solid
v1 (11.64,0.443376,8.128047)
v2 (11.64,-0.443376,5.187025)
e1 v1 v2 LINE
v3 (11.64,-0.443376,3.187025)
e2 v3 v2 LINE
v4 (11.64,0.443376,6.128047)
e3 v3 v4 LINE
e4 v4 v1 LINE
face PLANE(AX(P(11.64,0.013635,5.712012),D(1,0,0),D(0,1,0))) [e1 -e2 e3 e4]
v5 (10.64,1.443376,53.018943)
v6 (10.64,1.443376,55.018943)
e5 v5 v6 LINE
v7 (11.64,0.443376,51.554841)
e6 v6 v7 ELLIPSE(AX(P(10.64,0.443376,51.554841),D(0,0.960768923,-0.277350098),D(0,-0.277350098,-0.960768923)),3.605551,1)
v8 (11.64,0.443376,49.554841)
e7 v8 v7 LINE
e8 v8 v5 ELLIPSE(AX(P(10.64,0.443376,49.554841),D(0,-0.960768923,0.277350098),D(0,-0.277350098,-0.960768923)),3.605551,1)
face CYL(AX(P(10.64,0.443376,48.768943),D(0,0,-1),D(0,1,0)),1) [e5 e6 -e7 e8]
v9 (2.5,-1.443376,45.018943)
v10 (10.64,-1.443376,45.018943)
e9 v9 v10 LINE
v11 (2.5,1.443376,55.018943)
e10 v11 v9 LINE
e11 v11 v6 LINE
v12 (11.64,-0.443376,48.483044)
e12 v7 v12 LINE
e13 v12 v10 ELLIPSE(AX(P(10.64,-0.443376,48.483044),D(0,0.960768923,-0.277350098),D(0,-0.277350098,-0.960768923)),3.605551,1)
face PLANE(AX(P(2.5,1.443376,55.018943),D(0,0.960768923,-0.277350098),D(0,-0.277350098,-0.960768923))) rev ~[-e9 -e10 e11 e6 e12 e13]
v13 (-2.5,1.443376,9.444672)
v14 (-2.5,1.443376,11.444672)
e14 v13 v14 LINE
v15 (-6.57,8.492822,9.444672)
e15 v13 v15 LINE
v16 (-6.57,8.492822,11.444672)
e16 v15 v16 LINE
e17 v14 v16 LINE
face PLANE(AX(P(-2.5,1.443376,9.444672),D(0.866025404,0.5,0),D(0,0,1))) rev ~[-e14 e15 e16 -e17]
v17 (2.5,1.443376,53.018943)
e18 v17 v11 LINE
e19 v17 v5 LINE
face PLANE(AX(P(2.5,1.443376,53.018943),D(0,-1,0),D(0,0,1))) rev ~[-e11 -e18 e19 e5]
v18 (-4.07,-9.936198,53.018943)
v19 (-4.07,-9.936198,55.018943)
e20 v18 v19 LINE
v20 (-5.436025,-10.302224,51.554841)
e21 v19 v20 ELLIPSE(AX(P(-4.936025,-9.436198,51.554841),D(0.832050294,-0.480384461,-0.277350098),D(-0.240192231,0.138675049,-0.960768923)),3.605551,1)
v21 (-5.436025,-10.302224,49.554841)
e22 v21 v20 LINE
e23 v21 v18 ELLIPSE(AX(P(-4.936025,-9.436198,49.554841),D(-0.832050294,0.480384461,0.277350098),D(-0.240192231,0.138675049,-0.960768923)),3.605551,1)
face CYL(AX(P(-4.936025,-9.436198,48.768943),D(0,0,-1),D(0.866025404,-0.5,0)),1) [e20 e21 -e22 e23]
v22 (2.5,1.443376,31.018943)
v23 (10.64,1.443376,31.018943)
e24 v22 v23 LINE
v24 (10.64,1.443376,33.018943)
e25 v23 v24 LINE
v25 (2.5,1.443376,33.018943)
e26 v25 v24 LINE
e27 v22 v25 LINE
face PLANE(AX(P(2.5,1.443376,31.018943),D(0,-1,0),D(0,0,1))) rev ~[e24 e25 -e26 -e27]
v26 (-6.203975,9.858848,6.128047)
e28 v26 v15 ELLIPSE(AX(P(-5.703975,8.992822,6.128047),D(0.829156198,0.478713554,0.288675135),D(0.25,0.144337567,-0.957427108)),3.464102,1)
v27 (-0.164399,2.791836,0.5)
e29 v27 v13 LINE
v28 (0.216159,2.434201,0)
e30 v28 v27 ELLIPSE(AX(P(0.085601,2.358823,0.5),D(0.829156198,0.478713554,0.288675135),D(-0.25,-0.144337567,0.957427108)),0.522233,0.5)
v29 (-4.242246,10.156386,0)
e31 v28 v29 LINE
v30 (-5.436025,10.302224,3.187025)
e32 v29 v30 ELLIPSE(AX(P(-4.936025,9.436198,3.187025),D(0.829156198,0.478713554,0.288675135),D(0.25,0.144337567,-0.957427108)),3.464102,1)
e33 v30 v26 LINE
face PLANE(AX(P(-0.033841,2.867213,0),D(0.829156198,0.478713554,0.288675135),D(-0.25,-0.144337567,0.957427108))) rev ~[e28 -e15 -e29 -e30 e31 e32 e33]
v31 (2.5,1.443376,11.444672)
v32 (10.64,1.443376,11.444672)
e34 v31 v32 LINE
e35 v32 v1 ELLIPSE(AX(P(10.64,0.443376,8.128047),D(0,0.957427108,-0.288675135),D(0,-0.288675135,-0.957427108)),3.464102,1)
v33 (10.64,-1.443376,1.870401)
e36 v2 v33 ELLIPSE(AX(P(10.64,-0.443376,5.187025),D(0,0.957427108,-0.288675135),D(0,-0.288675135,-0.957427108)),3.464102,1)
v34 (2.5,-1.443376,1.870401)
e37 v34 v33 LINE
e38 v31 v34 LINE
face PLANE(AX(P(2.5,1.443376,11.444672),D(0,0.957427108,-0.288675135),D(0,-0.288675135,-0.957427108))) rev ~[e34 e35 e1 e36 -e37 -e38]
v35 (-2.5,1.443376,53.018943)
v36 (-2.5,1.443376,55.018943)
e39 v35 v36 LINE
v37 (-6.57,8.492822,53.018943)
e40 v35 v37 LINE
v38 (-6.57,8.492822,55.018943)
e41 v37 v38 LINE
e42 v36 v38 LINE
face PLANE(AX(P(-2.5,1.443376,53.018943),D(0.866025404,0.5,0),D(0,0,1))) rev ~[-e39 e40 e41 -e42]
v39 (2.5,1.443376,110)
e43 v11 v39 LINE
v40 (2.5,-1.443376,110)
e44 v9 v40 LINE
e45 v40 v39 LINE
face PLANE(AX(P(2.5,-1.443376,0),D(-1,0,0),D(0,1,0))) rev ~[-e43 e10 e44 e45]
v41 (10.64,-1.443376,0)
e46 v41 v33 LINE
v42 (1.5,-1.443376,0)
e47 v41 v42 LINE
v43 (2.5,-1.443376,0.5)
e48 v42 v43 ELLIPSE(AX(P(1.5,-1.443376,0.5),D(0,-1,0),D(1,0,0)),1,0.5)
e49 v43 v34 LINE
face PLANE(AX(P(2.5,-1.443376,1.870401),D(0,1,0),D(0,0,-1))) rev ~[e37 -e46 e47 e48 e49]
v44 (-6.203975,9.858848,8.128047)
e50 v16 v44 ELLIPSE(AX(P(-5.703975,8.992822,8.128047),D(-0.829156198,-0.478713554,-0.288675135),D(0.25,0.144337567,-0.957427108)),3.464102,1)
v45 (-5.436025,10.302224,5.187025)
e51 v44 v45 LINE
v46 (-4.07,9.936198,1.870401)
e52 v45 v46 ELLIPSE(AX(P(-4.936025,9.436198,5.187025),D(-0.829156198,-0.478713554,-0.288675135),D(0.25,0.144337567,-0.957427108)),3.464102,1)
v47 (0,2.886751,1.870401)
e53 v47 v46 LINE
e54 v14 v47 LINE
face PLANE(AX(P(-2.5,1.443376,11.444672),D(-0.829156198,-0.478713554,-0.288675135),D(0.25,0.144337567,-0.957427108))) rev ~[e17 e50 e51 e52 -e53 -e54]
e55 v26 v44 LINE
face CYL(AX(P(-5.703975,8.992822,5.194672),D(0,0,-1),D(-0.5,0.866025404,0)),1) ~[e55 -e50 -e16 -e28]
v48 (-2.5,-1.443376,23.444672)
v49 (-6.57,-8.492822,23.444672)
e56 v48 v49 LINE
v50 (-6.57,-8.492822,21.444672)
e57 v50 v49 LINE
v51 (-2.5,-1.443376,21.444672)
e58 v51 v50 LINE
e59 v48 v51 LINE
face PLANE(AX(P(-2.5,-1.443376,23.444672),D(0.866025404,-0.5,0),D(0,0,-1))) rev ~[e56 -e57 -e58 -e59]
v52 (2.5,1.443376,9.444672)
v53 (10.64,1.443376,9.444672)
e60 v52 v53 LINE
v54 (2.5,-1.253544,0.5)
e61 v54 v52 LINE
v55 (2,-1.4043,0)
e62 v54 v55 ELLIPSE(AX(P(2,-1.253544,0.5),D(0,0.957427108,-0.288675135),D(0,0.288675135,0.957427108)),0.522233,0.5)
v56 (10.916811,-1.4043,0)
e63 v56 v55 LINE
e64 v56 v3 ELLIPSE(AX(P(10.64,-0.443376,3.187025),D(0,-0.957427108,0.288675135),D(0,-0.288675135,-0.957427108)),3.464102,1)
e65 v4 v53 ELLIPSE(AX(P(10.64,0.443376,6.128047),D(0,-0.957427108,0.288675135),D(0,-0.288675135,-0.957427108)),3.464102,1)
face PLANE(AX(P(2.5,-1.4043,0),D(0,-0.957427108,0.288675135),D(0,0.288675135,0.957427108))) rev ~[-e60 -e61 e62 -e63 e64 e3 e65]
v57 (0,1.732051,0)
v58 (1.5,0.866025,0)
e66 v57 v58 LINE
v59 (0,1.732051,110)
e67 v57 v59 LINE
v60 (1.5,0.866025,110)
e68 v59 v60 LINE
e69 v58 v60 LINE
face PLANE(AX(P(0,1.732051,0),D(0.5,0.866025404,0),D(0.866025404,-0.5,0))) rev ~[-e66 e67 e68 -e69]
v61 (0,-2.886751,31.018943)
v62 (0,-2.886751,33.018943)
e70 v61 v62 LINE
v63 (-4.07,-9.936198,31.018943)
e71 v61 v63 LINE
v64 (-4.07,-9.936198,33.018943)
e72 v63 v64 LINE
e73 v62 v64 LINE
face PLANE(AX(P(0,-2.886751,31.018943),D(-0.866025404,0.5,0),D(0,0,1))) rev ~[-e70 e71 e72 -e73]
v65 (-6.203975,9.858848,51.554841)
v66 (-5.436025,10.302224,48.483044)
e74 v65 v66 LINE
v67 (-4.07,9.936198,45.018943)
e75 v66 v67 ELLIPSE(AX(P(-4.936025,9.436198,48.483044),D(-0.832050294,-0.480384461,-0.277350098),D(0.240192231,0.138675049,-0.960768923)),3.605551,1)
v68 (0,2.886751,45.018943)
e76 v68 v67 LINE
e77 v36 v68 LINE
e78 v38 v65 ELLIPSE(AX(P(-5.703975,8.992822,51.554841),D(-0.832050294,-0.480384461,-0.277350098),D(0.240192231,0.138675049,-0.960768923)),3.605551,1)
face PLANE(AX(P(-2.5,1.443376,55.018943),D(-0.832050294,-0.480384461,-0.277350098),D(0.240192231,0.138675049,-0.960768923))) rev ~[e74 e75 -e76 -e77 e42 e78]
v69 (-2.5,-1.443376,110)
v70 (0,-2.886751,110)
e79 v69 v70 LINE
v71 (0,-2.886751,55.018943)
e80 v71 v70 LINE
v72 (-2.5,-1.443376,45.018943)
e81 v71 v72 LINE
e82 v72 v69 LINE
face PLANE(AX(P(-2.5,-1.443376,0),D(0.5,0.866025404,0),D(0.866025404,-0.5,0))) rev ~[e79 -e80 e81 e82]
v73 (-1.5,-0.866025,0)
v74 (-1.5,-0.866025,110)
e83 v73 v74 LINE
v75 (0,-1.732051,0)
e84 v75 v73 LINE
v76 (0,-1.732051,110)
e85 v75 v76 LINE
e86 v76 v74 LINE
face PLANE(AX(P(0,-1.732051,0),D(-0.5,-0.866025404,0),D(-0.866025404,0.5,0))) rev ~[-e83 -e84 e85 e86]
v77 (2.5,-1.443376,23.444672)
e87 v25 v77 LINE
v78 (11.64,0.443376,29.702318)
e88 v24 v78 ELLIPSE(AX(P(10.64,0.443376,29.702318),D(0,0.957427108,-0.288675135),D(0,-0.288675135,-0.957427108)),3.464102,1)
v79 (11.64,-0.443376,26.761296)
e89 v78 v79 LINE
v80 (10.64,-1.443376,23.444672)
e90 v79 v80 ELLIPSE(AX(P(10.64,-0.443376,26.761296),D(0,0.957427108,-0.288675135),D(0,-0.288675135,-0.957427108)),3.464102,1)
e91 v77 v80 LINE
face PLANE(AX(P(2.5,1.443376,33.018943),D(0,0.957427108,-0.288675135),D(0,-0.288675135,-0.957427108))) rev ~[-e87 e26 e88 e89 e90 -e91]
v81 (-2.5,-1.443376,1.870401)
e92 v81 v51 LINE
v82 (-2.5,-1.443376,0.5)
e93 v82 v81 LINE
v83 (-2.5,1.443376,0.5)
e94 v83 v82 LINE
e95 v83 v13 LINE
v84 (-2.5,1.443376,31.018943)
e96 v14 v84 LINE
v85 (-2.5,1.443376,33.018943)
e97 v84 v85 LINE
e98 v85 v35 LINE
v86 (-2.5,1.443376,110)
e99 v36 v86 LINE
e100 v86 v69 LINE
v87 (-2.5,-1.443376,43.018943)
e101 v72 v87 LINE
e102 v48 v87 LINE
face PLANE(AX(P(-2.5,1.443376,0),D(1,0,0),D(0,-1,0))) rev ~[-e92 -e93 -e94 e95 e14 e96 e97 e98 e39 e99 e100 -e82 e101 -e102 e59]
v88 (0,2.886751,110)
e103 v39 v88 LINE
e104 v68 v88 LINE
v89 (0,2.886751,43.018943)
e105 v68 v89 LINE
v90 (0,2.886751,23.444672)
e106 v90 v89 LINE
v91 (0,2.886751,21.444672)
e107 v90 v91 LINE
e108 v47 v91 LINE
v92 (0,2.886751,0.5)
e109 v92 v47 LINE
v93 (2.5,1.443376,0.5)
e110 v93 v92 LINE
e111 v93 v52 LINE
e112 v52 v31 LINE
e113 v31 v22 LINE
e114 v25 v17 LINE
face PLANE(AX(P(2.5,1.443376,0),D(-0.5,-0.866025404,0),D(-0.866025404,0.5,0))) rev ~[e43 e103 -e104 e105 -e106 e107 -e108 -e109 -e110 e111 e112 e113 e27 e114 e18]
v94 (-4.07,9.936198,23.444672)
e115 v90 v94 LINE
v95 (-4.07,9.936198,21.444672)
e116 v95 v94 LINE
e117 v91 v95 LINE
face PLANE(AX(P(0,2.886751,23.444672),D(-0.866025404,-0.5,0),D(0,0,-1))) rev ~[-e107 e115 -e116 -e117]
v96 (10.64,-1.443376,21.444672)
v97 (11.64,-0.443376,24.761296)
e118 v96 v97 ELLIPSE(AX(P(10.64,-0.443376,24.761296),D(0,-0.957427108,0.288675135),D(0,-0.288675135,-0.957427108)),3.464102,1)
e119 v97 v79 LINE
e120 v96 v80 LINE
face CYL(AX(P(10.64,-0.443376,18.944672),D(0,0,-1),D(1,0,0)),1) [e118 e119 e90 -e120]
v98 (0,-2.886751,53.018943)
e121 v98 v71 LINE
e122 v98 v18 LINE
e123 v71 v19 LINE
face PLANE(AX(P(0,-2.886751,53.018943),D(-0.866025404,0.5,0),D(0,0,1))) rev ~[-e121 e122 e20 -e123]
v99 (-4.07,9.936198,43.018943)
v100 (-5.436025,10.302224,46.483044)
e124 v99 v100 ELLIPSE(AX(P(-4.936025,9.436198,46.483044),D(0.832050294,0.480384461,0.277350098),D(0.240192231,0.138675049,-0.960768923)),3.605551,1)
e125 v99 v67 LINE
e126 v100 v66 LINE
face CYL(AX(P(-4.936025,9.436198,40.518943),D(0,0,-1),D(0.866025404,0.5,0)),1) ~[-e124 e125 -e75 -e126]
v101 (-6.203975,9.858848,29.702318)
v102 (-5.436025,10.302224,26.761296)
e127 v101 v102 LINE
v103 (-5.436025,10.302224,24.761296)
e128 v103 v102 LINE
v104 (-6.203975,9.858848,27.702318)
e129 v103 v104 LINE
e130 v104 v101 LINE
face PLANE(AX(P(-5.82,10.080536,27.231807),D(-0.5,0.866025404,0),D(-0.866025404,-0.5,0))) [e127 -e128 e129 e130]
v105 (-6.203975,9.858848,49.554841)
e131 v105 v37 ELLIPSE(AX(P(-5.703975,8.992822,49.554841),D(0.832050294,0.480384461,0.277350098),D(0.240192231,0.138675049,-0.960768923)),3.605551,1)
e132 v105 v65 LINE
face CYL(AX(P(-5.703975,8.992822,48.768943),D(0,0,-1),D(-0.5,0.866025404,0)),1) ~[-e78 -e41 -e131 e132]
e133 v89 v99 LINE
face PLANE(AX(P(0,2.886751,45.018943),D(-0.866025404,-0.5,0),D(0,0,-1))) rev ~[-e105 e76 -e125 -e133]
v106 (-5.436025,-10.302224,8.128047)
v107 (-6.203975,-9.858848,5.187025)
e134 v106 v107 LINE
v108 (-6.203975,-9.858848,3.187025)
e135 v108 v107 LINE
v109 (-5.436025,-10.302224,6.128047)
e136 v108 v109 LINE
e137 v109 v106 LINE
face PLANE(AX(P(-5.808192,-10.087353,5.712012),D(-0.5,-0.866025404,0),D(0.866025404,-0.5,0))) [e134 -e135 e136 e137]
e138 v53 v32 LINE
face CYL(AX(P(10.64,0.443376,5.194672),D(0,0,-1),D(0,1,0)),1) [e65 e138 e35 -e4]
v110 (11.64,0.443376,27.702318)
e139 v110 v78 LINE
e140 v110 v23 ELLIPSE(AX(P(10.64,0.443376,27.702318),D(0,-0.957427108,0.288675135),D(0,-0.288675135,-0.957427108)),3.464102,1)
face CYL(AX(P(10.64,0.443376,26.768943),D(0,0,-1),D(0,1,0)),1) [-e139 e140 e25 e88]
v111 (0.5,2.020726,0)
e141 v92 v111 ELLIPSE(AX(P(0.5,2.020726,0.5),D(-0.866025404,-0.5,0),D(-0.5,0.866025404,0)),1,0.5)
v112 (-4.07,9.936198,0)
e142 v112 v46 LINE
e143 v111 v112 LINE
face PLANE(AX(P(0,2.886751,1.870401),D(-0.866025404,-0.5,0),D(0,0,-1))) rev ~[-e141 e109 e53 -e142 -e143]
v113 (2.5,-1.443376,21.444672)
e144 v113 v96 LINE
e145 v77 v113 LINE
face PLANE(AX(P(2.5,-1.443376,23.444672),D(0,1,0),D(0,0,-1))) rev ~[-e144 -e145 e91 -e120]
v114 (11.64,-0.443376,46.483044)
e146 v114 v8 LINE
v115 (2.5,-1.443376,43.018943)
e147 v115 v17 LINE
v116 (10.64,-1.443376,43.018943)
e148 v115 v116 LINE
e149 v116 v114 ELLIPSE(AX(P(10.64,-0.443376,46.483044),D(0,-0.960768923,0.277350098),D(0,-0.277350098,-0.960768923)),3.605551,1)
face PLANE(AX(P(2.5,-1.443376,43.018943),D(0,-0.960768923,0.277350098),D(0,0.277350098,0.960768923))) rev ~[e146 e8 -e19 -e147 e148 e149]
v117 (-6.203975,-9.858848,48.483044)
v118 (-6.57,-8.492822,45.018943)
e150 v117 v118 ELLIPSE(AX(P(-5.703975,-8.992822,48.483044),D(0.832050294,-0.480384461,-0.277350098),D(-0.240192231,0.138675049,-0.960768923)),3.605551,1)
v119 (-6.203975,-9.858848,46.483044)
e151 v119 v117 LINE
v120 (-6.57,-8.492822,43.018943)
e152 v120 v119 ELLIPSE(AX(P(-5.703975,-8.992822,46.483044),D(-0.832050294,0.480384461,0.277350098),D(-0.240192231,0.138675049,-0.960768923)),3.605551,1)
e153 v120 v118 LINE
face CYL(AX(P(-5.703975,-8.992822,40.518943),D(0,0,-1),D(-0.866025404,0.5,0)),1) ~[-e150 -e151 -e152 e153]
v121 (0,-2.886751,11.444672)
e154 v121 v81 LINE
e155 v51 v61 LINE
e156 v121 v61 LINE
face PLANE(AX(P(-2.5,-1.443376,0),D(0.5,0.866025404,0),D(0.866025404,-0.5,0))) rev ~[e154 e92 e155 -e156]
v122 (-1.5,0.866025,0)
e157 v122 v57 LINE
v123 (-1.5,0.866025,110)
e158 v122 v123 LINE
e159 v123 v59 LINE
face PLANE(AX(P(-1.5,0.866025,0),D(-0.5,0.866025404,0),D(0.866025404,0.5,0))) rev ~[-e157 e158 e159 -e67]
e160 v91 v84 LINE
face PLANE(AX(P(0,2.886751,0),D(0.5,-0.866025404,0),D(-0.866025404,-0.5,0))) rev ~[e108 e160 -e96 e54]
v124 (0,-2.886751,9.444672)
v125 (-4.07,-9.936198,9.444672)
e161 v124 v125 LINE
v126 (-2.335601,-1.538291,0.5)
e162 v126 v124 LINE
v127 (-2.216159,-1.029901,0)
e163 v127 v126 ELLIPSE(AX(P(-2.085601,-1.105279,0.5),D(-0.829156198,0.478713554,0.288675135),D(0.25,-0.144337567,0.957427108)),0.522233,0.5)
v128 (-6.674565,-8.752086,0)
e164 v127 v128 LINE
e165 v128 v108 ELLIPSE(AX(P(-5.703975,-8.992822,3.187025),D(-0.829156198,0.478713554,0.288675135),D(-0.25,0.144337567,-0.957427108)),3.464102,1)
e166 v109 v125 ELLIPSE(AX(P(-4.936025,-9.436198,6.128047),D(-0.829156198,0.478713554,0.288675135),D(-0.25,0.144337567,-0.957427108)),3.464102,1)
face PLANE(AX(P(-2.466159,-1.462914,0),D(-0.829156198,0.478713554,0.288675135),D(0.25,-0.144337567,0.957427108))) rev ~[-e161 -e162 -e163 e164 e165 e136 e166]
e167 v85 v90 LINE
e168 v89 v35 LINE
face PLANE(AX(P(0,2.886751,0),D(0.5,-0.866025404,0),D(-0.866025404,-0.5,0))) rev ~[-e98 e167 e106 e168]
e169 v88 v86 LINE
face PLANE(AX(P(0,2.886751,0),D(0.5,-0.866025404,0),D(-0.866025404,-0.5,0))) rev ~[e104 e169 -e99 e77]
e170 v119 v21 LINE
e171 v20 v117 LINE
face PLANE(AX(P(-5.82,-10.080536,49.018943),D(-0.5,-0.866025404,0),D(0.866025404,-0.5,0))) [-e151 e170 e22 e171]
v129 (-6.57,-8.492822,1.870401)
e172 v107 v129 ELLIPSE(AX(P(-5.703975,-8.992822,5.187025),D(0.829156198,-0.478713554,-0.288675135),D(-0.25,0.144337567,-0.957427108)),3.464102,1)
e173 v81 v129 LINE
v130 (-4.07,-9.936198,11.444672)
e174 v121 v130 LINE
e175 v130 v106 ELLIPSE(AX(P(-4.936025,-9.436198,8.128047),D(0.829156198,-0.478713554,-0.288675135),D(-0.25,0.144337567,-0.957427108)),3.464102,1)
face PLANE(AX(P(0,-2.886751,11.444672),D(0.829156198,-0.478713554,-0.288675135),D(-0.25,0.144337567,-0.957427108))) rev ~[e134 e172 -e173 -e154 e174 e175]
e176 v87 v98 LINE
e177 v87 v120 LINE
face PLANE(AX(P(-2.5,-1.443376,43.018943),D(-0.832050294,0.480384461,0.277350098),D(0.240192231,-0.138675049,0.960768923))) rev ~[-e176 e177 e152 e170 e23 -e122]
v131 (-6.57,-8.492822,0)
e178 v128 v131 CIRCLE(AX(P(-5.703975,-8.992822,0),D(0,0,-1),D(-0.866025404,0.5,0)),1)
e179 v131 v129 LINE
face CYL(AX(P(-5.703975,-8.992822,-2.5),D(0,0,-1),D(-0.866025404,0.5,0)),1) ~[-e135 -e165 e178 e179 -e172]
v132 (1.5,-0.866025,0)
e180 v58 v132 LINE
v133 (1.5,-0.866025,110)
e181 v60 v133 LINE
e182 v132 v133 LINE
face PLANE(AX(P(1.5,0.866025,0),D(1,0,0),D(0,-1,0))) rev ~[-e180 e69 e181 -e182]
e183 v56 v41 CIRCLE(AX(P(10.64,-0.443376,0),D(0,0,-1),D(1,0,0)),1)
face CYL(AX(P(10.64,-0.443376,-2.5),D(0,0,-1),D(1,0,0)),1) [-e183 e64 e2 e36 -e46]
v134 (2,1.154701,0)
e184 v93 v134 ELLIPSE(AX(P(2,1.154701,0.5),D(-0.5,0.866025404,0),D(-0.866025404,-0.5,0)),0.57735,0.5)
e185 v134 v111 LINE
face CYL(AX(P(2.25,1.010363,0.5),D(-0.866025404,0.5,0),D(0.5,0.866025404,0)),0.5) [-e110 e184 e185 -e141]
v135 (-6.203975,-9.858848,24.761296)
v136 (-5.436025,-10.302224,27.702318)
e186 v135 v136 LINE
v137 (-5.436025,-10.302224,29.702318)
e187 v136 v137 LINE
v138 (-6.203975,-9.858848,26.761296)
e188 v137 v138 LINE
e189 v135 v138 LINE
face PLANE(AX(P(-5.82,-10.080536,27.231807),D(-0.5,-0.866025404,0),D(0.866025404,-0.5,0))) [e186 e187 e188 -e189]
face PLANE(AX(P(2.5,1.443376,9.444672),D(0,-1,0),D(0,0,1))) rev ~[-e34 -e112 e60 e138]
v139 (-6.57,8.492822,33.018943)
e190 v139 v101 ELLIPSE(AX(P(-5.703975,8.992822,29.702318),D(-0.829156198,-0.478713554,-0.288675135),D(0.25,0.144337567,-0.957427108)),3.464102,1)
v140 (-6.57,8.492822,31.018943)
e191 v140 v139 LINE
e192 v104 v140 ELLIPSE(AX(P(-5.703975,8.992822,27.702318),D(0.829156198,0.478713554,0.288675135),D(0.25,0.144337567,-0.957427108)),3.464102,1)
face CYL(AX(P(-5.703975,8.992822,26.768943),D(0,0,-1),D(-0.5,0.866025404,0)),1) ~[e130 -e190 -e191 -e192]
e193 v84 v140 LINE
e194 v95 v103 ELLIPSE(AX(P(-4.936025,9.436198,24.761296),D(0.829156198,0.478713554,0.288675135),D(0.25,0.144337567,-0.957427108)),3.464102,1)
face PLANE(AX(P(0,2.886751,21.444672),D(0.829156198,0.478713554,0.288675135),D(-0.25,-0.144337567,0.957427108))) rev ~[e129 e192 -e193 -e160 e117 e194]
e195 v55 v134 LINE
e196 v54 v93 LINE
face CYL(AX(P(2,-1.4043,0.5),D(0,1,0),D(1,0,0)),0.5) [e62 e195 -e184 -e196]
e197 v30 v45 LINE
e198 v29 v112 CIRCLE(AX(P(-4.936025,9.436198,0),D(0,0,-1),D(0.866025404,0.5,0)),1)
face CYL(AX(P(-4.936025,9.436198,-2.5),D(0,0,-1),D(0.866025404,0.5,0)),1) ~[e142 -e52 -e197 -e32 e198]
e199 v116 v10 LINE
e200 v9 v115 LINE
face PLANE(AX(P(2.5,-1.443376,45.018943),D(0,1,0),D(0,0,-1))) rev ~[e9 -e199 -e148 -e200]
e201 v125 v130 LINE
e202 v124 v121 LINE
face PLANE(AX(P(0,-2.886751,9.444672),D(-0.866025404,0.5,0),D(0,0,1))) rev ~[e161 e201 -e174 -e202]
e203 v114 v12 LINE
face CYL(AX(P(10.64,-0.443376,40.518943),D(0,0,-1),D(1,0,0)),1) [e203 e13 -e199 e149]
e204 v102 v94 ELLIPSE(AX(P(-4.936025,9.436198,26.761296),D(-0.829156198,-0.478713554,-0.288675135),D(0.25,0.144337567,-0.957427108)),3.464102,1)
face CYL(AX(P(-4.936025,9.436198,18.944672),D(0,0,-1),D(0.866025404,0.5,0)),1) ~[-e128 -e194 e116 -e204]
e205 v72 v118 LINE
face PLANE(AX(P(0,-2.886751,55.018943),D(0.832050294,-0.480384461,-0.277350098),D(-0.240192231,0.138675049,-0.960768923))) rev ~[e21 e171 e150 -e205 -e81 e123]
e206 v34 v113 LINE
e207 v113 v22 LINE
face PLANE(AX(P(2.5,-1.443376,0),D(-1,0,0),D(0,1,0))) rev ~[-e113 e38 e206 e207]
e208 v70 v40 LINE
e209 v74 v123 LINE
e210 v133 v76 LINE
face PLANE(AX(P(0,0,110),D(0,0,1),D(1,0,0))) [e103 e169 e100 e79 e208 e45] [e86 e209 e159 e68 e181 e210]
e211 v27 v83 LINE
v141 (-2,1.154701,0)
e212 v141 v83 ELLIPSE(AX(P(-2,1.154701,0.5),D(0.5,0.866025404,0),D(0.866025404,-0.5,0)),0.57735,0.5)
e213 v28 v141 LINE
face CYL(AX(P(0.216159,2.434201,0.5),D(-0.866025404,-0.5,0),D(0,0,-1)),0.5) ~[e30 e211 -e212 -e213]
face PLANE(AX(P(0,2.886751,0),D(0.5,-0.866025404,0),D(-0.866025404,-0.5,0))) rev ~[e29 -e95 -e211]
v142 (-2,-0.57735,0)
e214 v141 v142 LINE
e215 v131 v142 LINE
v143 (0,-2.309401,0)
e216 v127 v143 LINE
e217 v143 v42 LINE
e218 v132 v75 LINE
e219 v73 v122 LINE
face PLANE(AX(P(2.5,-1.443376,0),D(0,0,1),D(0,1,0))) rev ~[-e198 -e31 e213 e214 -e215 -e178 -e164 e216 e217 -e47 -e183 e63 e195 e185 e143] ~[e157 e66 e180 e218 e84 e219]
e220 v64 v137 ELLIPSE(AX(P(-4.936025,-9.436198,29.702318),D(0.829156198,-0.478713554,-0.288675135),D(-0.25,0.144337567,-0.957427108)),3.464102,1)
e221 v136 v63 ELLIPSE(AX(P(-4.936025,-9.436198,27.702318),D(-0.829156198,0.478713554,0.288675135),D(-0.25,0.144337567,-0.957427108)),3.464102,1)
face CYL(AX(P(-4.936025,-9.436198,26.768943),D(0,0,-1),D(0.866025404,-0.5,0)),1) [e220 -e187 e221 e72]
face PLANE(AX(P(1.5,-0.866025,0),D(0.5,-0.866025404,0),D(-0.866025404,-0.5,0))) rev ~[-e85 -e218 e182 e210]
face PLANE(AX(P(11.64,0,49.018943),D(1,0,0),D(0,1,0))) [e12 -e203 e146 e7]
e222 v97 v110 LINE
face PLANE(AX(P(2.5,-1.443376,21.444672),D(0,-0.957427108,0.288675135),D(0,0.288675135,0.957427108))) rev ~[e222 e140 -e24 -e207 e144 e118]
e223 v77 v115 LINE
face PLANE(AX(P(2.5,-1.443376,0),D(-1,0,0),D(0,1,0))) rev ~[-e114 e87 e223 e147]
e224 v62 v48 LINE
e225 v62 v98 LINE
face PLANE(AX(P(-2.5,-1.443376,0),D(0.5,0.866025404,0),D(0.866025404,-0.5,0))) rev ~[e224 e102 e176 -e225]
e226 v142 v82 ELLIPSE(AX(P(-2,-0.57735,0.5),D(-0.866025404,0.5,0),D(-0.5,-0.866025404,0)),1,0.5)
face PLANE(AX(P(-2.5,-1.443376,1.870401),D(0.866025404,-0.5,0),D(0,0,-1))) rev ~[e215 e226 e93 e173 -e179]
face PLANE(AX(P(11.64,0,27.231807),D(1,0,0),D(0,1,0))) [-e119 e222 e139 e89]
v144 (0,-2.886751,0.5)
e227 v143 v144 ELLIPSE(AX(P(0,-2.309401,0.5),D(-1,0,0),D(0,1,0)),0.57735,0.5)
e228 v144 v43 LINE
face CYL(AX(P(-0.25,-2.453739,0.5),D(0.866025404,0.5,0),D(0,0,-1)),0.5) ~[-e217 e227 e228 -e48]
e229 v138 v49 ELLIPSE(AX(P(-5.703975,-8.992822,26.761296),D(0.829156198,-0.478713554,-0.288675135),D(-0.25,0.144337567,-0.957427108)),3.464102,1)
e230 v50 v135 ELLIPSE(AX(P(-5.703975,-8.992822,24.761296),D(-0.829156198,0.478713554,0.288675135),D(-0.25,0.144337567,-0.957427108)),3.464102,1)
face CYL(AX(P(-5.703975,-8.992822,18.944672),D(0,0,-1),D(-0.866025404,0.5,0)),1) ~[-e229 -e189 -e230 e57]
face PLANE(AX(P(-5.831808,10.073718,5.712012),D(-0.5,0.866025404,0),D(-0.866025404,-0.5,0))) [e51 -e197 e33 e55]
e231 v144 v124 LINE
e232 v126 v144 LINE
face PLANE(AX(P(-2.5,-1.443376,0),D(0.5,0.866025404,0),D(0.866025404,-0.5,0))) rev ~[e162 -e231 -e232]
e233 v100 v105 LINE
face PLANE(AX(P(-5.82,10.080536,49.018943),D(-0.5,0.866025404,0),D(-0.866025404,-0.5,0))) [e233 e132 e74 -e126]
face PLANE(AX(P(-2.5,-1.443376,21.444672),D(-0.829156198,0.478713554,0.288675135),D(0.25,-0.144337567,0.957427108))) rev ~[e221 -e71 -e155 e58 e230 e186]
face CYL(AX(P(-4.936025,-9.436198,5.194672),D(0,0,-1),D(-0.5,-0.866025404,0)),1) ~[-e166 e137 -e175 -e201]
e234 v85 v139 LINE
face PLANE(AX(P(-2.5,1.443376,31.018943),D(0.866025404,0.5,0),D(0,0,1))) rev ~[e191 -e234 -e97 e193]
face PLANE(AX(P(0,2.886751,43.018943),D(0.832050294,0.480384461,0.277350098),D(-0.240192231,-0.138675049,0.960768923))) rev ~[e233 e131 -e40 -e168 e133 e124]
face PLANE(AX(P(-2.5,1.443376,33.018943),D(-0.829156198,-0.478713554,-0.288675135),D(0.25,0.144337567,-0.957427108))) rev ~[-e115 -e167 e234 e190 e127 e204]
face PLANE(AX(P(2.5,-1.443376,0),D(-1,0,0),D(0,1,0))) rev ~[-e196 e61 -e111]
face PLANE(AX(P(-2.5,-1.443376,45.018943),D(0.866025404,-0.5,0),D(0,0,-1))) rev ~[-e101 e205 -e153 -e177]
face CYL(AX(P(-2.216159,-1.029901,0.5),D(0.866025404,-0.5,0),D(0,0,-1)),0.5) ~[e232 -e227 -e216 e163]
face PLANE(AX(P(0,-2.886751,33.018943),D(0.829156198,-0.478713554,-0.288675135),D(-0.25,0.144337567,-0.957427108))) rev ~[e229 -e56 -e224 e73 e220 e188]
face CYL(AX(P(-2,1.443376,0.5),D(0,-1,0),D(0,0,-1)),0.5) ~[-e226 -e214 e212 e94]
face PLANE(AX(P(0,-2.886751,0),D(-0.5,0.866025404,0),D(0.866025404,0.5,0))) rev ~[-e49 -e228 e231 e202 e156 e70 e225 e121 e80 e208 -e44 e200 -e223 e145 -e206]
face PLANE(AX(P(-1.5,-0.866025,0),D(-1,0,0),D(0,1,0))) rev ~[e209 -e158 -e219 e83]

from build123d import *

# Parameters (mm, degrees)
F1_DEPTH     = 110
F3_DEPTH     = 9.14
F5_DEPTH     = 9.14
F7_DEPTH     = 9.14
F8_T1_DEPTH  = 8.75
F8_T3_DEPTH  = 8.75
F8_T5_DEPTH  = 8.75
F8_T7_DEPTH  = 8.75
F8_T9_DEPTH  = 8.75
F8_T11_DEPTH = 8.6204005009
F9_R         = 0.5


# Not quite as in the source:
# - a fillet or chamfer that OpenCascade refuses, or shapes differently, is made with other operations: its cross-section is extruded or revolved along the edge and cut away or added


with BuildPart() as f1:
    # F0 (on Top) → F1 (new body)
    with BuildSketch(Plane.XY):
        Polygon((2.5, 1.443375673), (0, 2.8867513459), (-2.5, 1.443375673), (-2.5, -1.443375673), (0, -2.8867513459), (2.5, -1.443375673), align=None)
        Polygon((-1.5, 0.8660254038), (0, 1.7320508076), (1.5, 0.8660254038), (1.5, -0.8660254038), (0, -1.7320508076), (-1.5, -0.8660254038), align=None, mode=Mode.SUBTRACT)
    extrude(amount=F1_DEPTH)

    # F2 (on face) → F3 (join)
    with BuildSketch(Plane(origin=(-1.25, -2.1650635095, 0), x_dir=(0.8660254038, -0.5, 0), z_dir=(-0.5, -0.8660254038, 0))):
        Polygon((-1.443375673, 43.018942656), (1.443375673, 53.018942656), (1.443375673, 55.018942656), (-1.443375673, 45.018942656), align=None)
        Polygon((1.443375673, 31.018942656), (1.443375673, 33.018942656), (-1.443375673, 23.4446715784), (-1.443375673, 21.4446715784), align=None)
        Polygon((1.443375673, 9.4446715784), (1.443375673, 11.4446715784), (-1.443375673, 1.8704005009), (-1.443375673, 0), (-1.4042999537, 0), align=None)
    extrude(amount=F3_DEPTH)

    # F4 (on face) → F5 (join)
    with BuildSketch(Plane(origin=(-1.25, 2.1650635095, 0), x_dir=(-0.8660254038, -0.5, 0), z_dir=(-0.5, 0.8660254038, 0))):
        Polygon((-1.443375673, 43.018942656), (1.443375673, 53.018942656), (1.443375673, 55.018942656), (-1.443375673, 45.018942656), align=None)
        Polygon((1.443375673, 31.018942656), (1.443375673, 33.018942656), (-1.443375673, 23.4446715784), (-1.443375673, 21.4446715784), align=None)
        Polygon((1.443375673, 9.4446715784), (1.443375673, 11.4446715784), (-1.443375673, 1.8704005009), (-1.443375673, 0), (-1.4042999537, 0), align=None)
    extrude(amount=F5_DEPTH)

    # F6 (on face) → F7 (join)
    with BuildSketch(Plane.YZ.offset(2.5)):
        Polygon((-1.443375673, 43.018942656), (1.443375673, 53.018942656), (1.443375673, 55.018942656), (-1.443375673, 45.018942656), align=None)
        Polygon((1.443375673, 31.018942656), (1.443375673, 33.018942656), (-1.443375673, 23.4446715784), (-1.443375673, 21.4446715784), align=None)
        Polygon((1.443375673, 9.4446715784), (1.443375673, 11.4446715784), (-1.443375673, 1.8704005009), (-1.443375673, 0), (-1.4042999537, 0), align=None)
    extrude(amount=F7_DEPTH)

    # F8: fillet of radius 1 on 18 edges, made by hand

    # F8_s2 → F8_t1 (cut)
    with BuildSketch(Plane.XY.offset(40.518942656)):
        with BuildLine():
            ThreePointArc((-6.57, -8.4928224598), (-6.6699004225, -9.2516415049), (-6.2039745962, -9.8588478636))
            Line((-6.2039745962, -9.8588478636), (-7.07, -9.3588478636))
            Line((-7.07, -9.3588478636), (-6.57, -8.4928224598))
        make_face()
        with BuildLine():
            ThreePointArc((11.64, -0.443375673), (11.3471067812, -1.1504824542), (10.64, -1.443375673))
            Line((10.64, -1.443375673), (11.64, -1.443375673))
            Line((11.64, -1.443375673), (11.64, -0.443375673))
        make_face()
        with BuildLine():
            ThreePointArc((-4.07, 9.9361981328), (-4.6772063587, 10.402123959), (-5.4360254038, 10.3022235365))
            Line((-5.4360254038, 10.3022235365), (-4.57, 10.8022235365))
            Line((-4.57, 10.8022235365), (-4.07, 9.9361981328))
        make_face()
    extrude(amount=F8_T1_DEPTH, mode=Mode.SUBTRACT)

    # F8_s4 → F8_t3 (cut)
    with BuildSketch(Plane.XY.offset(48.768942656)):
        with BuildLine():
            ThreePointArc((-4.07, -9.9361981328), (-4.6772063587, -10.402123959), (-5.4360254038, -10.3022235365))
            Line((-5.4360254038, -10.3022235365), (-4.57, -10.8022235365))
            Line((-4.57, -10.8022235365), (-4.07, -9.9361981328))
        make_face()
        with BuildLine():
            ThreePointArc((10.64, 1.443375673), (11.3471067812, 1.1504824542), (11.64, 0.443375673))
            Line((11.64, 0.443375673), (11.64, 1.443375673))
            Line((11.64, 1.443375673), (10.64, 1.443375673))
        make_face()
        with BuildLine():
            ThreePointArc((-6.2039745962, 9.8588478636), (-6.6699004225, 9.2516415049), (-6.57, 8.4928224598))
            Line((-6.57, 8.4928224598), (-7.07, 9.3588478636))
            Line((-7.07, 9.3588478636), (-6.2039745962, 9.8588478636))
        make_face()
    extrude(amount=F8_T3_DEPTH, mode=Mode.SUBTRACT)

    # F8_s6 → F8_t5 (cut)
    with BuildSketch(Plane.XY.offset(26.768942656)):
        with BuildLine():
            ThreePointArc((-4.07, -9.9361981328), (-4.6772063587, -10.402123959), (-5.4360254038, -10.3022235365))
            Line((-5.4360254038, -10.3022235365), (-4.57, -10.8022235365))
            Line((-4.57, -10.8022235365), (-4.07, -9.9361981328))
        make_face()
        with BuildLine():
            ThreePointArc((10.64, 1.443375673), (11.3471067812, 1.1504824542), (11.64, 0.443375673))
            Line((11.64, 0.443375673), (11.64, 1.443375673))
            Line((11.64, 1.443375673), (10.64, 1.443375673))
        make_face()
        with BuildLine():
            ThreePointArc((-6.2039745962, 9.8588478636), (-6.6699004225, 9.2516415049), (-6.57, 8.4928224598))
            Line((-6.57, 8.4928224598), (-7.07, 9.3588478636))
            Line((-7.07, 9.3588478636), (-6.2039745962, 9.8588478636))
        make_face()
    extrude(amount=F8_T5_DEPTH, mode=Mode.SUBTRACT)

    # F8_s8 → F8_t7 (cut)
    with BuildSketch(Plane.XY.offset(18.9446715784)):
        with BuildLine():
            ThreePointArc((-6.57, -8.4928224598), (-6.6699004225, -9.2516415049), (-6.2039745962, -9.8588478636))
            Line((-6.2039745962, -9.8588478636), (-7.07, -9.3588478636))
            Line((-7.07, -9.3588478636), (-6.57, -8.4928224598))
        make_face()
        with BuildLine():
            ThreePointArc((11.64, -0.443375673), (11.3471067812, -1.1504824542), (10.64, -1.443375673))
            Line((10.64, -1.443375673), (11.64, -1.443375673))
            Line((11.64, -1.443375673), (11.64, -0.443375673))
        make_face()
        with BuildLine():
            ThreePointArc((-4.07, 9.9361981328), (-4.6772063587, 10.402123959), (-5.4360254038, 10.3022235365))
            Line((-5.4360254038, 10.3022235365), (-4.57, 10.8022235365))
            Line((-4.57, 10.8022235365), (-4.07, 9.9361981328))
        make_face()
    extrude(amount=F8_T7_DEPTH, mode=Mode.SUBTRACT)

    # F8_s10 → F8_t9 (cut)
    with BuildSketch(Plane.XY.offset(5.1946715784)):
        with BuildLine():
            ThreePointArc((-5.4360254038, -10.3022235365), (-4.6772063587, -10.402123959), (-4.07, -9.9361981328))
            Line((-4.07, -9.9361981328), (-4.57, -10.8022235365))
            Line((-4.57, -10.8022235365), (-5.4360254038, -10.3022235365))
        make_face()
        with BuildLine():
            ThreePointArc((10.64, 1.443375673), (11.3471067812, 1.1504824542), (11.64, 0.443375673))
            Line((11.64, 0.443375673), (11.64, 1.443375673))
            Line((11.64, 1.443375673), (10.64, 1.443375673))
        make_face()
        with BuildLine():
            ThreePointArc((-6.2039745962, 9.8588478636), (-6.6699004225, 9.2516415049), (-6.57, 8.4928224598))
            Line((-6.57, 8.4928224598), (-7.07, 9.3588478636))
            Line((-7.07, 9.3588478636), (-6.2039745962, 9.8588478636))
        make_face()
    extrude(amount=F8_T9_DEPTH, mode=Mode.SUBTRACT)

    # F8_s12 → F8_t11 (cut)
    with BuildSketch(Plane.XY.offset(-2.5)):
        with BuildLine():
            ThreePointArc((-6.57, -8.4928224598), (-6.6699004225, -9.2516415049), (-6.2039745962, -9.8588478636))
            Line((-6.2039745962, -9.8588478636), (-7.07, -9.3588478636))
            Line((-7.07, -9.3588478636), (-6.57, -8.4928224598))
        make_face()
        with BuildLine():
            ThreePointArc((11.64, -0.443375673), (11.3471067812, -1.1504824542), (10.64, -1.443375673))
            Line((10.64, -1.443375673), (11.64, -1.443375673))
            Line((11.64, -1.443375673), (11.64, -0.443375673))
        make_face()
        with BuildLine():
            ThreePointArc((-4.07, 9.9361981328), (-4.6772063587, 10.402123959), (-5.4360254038, 10.3022235365))
            Line((-5.4360254038, 10.3022235365), (-4.57, 10.8022235365))
            Line((-4.57, 10.8022235365), (-4.07, 9.9361981328))
        make_face()
    extrude(amount=F8_T11_DEPTH, mode=Mode.SUBTRACT)

    # F9
    f9_edges = [f1.edges().sort_by_distance(p)[0] for p in [
        (1.25, -2.165064, 0),
        (-1.23308, -2.174832, 0),
        (-2.5, 0, 0),
        (-1.26692, 2.155295, 0),
        (1.25, 2.165064, 0),
        (2.5, 0.019538, 0),
    ]]
    fillet(f9_edges, radius=F9_R)


solid = f1.part
